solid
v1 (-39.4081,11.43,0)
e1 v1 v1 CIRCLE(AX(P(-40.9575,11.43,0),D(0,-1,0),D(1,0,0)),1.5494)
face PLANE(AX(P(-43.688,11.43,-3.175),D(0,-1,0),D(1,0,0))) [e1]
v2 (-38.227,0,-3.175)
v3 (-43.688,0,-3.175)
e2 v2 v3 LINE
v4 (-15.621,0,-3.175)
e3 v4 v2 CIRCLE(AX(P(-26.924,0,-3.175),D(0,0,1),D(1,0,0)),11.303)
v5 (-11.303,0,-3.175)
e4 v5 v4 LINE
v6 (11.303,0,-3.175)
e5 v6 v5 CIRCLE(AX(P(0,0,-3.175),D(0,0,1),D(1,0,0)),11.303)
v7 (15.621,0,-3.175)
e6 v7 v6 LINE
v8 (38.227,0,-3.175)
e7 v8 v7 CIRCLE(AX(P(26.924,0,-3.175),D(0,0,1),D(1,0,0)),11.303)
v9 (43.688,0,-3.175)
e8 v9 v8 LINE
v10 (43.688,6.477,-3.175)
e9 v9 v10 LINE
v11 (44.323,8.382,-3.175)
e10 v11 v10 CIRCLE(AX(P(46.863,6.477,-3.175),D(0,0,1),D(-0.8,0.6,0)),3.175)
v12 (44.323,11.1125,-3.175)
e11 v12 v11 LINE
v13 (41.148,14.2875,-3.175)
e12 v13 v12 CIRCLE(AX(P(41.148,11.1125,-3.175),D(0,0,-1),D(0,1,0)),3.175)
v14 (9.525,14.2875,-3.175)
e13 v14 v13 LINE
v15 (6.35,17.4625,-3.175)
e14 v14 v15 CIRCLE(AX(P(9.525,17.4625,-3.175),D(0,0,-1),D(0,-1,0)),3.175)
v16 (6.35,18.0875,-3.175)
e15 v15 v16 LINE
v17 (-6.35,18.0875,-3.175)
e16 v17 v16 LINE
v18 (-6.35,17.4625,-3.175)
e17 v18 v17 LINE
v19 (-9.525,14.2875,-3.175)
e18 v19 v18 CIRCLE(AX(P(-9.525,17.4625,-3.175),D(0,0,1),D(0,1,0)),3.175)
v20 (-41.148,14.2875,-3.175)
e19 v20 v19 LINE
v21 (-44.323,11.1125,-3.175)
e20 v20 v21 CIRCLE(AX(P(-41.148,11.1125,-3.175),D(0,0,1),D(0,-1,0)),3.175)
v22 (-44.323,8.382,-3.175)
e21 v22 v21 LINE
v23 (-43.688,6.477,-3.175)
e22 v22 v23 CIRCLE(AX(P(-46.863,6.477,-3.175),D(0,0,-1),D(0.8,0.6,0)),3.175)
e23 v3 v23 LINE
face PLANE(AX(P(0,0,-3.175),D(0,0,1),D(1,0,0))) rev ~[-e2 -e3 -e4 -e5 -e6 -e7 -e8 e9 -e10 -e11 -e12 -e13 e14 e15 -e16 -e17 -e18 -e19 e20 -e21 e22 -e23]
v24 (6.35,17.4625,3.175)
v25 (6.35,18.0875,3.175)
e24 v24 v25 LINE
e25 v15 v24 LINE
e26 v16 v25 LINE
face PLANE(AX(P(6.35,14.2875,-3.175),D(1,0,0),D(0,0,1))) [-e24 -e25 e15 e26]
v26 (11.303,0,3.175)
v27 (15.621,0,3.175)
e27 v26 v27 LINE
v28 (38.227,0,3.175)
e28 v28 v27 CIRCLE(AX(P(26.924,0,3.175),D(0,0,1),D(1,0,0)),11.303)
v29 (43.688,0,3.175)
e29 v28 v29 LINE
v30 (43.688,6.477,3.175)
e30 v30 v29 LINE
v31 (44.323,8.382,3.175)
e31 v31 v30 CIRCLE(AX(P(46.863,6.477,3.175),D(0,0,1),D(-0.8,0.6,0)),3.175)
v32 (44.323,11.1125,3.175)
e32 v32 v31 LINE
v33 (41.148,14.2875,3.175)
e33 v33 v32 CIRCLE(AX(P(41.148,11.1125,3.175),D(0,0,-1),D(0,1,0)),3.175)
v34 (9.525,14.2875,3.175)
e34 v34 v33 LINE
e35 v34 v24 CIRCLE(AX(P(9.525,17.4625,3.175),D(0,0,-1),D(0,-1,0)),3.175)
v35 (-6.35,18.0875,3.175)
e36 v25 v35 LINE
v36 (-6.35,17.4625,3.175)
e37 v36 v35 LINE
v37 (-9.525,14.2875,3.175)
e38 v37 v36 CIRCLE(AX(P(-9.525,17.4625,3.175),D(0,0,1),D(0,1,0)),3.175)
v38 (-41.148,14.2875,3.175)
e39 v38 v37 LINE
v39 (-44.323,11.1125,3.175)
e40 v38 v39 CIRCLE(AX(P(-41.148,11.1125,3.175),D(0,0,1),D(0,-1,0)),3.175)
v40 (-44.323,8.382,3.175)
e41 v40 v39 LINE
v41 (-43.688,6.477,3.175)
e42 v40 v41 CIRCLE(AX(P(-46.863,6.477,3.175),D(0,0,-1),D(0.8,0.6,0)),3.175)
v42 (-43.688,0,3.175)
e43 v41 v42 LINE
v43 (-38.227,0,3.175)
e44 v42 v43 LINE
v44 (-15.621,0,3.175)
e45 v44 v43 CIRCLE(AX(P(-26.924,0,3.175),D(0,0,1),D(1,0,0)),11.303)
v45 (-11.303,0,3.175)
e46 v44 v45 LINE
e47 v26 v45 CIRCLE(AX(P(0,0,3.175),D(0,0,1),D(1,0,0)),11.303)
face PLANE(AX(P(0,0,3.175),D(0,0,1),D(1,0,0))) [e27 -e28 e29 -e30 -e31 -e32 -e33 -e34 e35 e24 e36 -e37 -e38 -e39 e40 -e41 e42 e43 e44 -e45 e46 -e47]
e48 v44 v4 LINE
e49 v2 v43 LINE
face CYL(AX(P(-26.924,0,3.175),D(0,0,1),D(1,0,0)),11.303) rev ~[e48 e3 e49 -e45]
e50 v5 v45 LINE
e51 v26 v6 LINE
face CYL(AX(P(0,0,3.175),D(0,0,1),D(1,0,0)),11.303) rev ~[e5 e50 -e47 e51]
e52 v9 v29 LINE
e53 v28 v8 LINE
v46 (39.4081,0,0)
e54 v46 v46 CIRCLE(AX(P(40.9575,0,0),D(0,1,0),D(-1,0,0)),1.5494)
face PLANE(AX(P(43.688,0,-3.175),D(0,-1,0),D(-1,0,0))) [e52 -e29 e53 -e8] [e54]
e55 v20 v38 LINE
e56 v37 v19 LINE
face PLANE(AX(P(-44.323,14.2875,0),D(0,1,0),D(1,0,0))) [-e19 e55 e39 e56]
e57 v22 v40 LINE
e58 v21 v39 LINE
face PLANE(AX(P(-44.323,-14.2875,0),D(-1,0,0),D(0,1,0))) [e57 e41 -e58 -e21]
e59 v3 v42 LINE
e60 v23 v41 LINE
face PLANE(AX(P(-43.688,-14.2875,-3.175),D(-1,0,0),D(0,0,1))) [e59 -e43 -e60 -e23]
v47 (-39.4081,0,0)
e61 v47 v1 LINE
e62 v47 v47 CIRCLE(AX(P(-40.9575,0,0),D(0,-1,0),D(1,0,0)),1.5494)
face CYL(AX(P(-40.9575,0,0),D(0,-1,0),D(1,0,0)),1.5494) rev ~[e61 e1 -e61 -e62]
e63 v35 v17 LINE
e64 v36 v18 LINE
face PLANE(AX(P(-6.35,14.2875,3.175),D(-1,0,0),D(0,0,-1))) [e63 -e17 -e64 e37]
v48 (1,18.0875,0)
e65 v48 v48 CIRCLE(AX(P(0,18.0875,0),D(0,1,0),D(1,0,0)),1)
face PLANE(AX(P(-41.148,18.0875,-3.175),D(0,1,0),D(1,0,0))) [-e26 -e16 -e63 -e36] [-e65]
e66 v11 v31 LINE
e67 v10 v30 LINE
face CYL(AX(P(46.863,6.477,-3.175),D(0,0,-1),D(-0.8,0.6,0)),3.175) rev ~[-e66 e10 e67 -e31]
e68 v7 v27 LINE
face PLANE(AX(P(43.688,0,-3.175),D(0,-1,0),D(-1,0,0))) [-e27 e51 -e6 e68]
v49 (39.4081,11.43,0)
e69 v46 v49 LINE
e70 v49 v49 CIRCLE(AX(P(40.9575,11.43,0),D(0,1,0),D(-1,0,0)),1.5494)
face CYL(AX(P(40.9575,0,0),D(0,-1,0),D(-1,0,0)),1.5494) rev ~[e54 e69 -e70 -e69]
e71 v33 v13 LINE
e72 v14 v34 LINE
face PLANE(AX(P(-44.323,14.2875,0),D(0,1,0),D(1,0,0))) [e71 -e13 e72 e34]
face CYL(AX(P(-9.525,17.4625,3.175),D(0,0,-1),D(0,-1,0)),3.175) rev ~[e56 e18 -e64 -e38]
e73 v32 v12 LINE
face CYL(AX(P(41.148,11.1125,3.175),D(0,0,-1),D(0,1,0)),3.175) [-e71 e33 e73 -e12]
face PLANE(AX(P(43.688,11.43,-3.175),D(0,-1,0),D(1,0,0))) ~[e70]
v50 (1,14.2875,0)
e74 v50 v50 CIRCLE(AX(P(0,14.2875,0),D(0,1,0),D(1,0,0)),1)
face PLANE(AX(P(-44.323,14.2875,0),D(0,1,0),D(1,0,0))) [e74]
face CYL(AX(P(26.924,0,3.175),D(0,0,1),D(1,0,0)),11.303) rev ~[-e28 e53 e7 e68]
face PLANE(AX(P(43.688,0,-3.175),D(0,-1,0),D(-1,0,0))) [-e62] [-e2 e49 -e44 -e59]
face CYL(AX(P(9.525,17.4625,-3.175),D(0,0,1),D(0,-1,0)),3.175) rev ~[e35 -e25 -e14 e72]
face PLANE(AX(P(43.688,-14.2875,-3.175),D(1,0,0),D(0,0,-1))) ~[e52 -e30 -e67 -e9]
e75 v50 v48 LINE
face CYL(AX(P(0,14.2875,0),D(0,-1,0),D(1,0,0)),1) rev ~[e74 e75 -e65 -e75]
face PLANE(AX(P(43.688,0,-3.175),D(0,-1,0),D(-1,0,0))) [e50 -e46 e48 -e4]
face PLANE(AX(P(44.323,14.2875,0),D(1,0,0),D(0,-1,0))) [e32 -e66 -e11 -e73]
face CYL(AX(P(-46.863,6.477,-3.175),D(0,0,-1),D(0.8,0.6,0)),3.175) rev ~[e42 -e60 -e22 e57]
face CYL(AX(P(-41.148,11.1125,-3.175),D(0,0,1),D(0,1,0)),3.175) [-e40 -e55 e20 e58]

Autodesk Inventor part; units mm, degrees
ref_plane "YZ Plane" through (0, 0, 0) normal (1, 0, 0) x (0, 1, 0)
ref_plane "XZ Plane" through (0, 0, 0) normal (0, 1, 0) x (-1, 0, 0)
ref_plane "XY Plane" through (0, 0, 0) normal (0, 0, 1) x (1, 0, 0)
sketch "Sketch1" plane through (0, 0, 0) normal (0, 0, 1) x (1, 0, 0)
  line L0 (-44.323, 14.2875) -> (44.323, 14.2875)
  line L1 (44.323, 14.2875) -> (44.323, -14.2875)
  line L2 (44.323, -14.2875) -> (-44.323, -14.2875)
  line L3 (-44.323, -14.2875) -> (-44.323, 14.2875)
  point P0 (0, 0)
  dimension "d0" = 88.646
  dimension "d1" = 44.323
  dimension "d2" = 14.2875
  dimension "d3" = 28.575
extrude "Extrusion1" add sketch "Sketch1" along normal mid plane 6.35
sketch "Sketch2" plane through (0, 0, 3.175) normal (0, 0, 1) x (1, 0, 0)
  circle A0 centre (-26.924, 0) radius 11.303
  circle A1 centre (0, 0) radius 11.303
  line L0 (44.323, -14.2875) -> (44.323, 14.2875) projected
  circle A2 centre (26.924, 0) radius 11.303
  line L1 (-44.323, 14.2875) -> (-44.323, -14.2875) projected
  line L2 (-44.323, 0) -> (44.323, 0) construction
  line L3 (44.323, 14.2875) -> (-44.323, 14.2875) projected
  point P0 (0, 0)
  dimension "d6" = 22.606
  dimension "d9" = 22.606
  dimension "d11" = 22.606
  dimension "d14" = 26.924
  dimension "d21" = 88.646
  dimension "d22" = 26.924
  dimension "d45" = 0
sketch "Sketch4" plane through (-44.323, -14.2875, -3.175) normal (-1, 0, 0) x (0, 0, 1)
  line L0 (0, 0) -> (0, 28.575) projected
  line L1 (6.35, 28.575) -> (6.35, 0) projected
  line L2 (0, 22.6695) -> (6.35, 22.6695)
  line L3 (6.35, 22.6695) -> (6.35, 5.9055)
  line L4 (6.35, 5.9055) -> (0, 5.9055)
  line L5 (0, 5.9055) -> (0, 22.6695)
  point P0 (3.175, 14.2875)
  dimension "d30" = 8.382
  dimension "d31" = 16.764
extrude "Extrusion3" cut sketch "Sketch4" against normal blind 0.635
mirror "Mirror1" about plane through (0, 0, 0) normal (1, 0, 0) of "Extrusion3"
sketch "Sketch7" plane through (-44.323, -14.2875, 3.175) normal (0, -1, 0) x (1, 0, 0)
  line L0 (30.353, -14.605) -> (58.293, -14.605)
  line L1 (58.293, -14.605) -> (58.293, 8.255)
  line L2 (58.293, 8.255) -> (30.353, 8.255)
  line L3 (30.353, 8.255) -> (30.353, -14.605)
  point P0 (44.323, -3.175)
  dimension "d39" = 27.94
  dimension "d40" = 22.86
  dimension "d41" = 11.43
  dimension "d42" = 13.97
extrude "Extrusion5" [suppressed]
extrude "Extrusion6" cut sketch "Sketch2" against normal blind 25.4
sketch "Sketch8" plane through (0, 0, -3.175) normal (0, 0, -1) x (-1, 0, 0)
  line L0 (43.688, 8.382) -> (43.688, -8.382) construction
  line L1 (43.688, 0) -> (-43.688, 0)
  line L2 (-43.688, 8.382) -> (-43.688, -8.382) construction
  line L3 (44.323, 14.2875) -> (-44.323, 14.2875) projected
  line L4 (44.323, 8.382) -> (44.323, 14.2875) projected
  line L5 (-44.323, 14.2875) -> (-44.323, 8.382) projected
  line L6 (-43.688, 8.382) -> (-43.688, 0)
  line L7 (-44.323, 8.382) -> (-43.688, 8.382) projected
  line L8 (43.688, 8.382) -> (43.688, 0)
  line L9 (43.688, 8.382) -> (44.323, 8.382) projected
  point P0 (0, 0)
extrude "Extrusion7" [suppressed]
sketch "Sketch9" plane through (0, 0, -3.175) normal (0, 0, -1) x (-1, 0, 0)
  line L0 (-44.323, -14.2875) -> (44.323, -14.2875) projected
  line L1 (44.323, -14.2875) -> (44.323, -8.382) projected
  line L2 (44.323, -8.382) -> (43.688, -8.382) projected
  line L3 (-43.688, -8.382) -> (-44.323, -8.382) projected
  line L4 (-44.323, -8.382) -> (-44.323, -14.2875) projected
  line L5 (-43.688, 8.382) -> (-43.688, -8.382) projected
  line L6 (-43.688, 0) -> (-43.688, -8.382)
  line L7 (-43.688, 0) -> (43.688, 0)
  line L8 (43.688, -8.382) -> (43.688, 8.382) projected
  line L9 (43.688, -8.382) -> (43.688, 0)
  point P0 (0, 0)
extrude "Extrusion8" cut sketch "Sketch9" against normal through all
sketch "Sketch10" plane through (-43.688, 0, -3.175) normal (0, -1, 0) x (1, 0, 0)
  line L0 (5.461, 6.35) -> (5.461, 0) projected
  line L1 (0, 0) -> (0, 6.35) projected
  line L2 (-0.635, 0) -> (-0.635, 6.35) projected
  line L3 (5.461, 6.35) -> (5.461, 0) projected
  line L4 (0, 6.35) -> (5.461, 6.35) projected
  line L5 (0, 0) -> (0, 6.35) projected
  line L6 (5.461, 0) -> (0, 0) projected
  circle A0 centre (2.7305, 3.175) radius 1.5494
  line L7 (86.614, 1.27) -> (80.264, 1.27) projected
  line L8 (86.614, 0) -> (80.264, 0) projected
  point P0 (43.688, 3.175)
  point P1 (84.328, 1.27)
  point P2 (77.978, 1.27)
  point P3 (84.328, 0)
  point P4 (77.978, 0)
  dimension "d58" = 3.0988
  dimension "d61" = 5.461
  dimension "d62" = 2.7305
  dimension "d78" = 3.175
  dimension "d90" = 6.35
extrude "Extrusion9" cut sketch "Sketch10" against normal blind 11.43 contours A0
mirror "Mirror2" about plane through (0, 0, 0) normal (1, 0, 0) of "Extrusion9"
thread "Thread1" size "5-40 UNC" class "2B" standard "ANSI Unified Screw Threads" full length
thread "Thread2" size "5-40 UNC" class "2B" standard "ANSI Unified Screw Threads" full length
fillet "Fillet1" radius 3.175 2 edges at (-44.323, 14.2875, 0) (44.323, 14.2875, 0)
sketch "Sketch12" plane through (-41.148, 14.2875, -3.175) normal (0, 1, 0) x (1, 0, 0)
  line L0 (82.296, -6.35) -> (0, -6.35) projected
  line L1 (34.798, 0) -> (47.498, 0)
  line L2 (47.498, 0) -> (47.498, -6.35)
  line L3 (47.498, -6.35) -> (34.798, -6.35)
  line L4 (34.798, -6.35) -> (34.798, 0)
  circle A0 centre (41.148, -3.175) radius 1
  line L5 (29.845, 0) -> (52.451, 0) projected
  dimension "d81" = 6.35
  dimension "d82" = 12.7
  dimension "d83" = 2
  dimension "d87" = 0
extrude "Extrusion11" add sketch "Sketch12" along normal blind 3.8
fillet "Fillet3" radius 3.175 2 edges at (6.35, 14.2875, 0) (-6.35, 14.2875, 0)
thread "Thread3" size "M2x0.4" class "6H" standard "ANSI Metric M Profile" full length
fillet "Fillet4" radius 3.175 2 edges at (43.688, 8.382, 0) (-43.688, 8.382, 0)
equation "\"d1\" = 0.5 * d0"
equation "\"d2\" = 0.5 * d3"
equation "\"d9\" = d7"
equation "\"d11\" = d9"
equation "\"d22\" = d14"
equation "\"d30\" = 0.5 * d31"
equation "\"d41\" = 0.5 * d40"
equation "\"d42\" = 0.5 * d39"
equation "\"d62\" = 0.5 * d61"
equation "\"d78\" = 0.5 * d90"
equation "\"d81\" = 0.5 * d82"
equation "\"d7\" = d6"
properties part number "Tube Holder Halve 2" material "Aluminum 6061-AHC"
